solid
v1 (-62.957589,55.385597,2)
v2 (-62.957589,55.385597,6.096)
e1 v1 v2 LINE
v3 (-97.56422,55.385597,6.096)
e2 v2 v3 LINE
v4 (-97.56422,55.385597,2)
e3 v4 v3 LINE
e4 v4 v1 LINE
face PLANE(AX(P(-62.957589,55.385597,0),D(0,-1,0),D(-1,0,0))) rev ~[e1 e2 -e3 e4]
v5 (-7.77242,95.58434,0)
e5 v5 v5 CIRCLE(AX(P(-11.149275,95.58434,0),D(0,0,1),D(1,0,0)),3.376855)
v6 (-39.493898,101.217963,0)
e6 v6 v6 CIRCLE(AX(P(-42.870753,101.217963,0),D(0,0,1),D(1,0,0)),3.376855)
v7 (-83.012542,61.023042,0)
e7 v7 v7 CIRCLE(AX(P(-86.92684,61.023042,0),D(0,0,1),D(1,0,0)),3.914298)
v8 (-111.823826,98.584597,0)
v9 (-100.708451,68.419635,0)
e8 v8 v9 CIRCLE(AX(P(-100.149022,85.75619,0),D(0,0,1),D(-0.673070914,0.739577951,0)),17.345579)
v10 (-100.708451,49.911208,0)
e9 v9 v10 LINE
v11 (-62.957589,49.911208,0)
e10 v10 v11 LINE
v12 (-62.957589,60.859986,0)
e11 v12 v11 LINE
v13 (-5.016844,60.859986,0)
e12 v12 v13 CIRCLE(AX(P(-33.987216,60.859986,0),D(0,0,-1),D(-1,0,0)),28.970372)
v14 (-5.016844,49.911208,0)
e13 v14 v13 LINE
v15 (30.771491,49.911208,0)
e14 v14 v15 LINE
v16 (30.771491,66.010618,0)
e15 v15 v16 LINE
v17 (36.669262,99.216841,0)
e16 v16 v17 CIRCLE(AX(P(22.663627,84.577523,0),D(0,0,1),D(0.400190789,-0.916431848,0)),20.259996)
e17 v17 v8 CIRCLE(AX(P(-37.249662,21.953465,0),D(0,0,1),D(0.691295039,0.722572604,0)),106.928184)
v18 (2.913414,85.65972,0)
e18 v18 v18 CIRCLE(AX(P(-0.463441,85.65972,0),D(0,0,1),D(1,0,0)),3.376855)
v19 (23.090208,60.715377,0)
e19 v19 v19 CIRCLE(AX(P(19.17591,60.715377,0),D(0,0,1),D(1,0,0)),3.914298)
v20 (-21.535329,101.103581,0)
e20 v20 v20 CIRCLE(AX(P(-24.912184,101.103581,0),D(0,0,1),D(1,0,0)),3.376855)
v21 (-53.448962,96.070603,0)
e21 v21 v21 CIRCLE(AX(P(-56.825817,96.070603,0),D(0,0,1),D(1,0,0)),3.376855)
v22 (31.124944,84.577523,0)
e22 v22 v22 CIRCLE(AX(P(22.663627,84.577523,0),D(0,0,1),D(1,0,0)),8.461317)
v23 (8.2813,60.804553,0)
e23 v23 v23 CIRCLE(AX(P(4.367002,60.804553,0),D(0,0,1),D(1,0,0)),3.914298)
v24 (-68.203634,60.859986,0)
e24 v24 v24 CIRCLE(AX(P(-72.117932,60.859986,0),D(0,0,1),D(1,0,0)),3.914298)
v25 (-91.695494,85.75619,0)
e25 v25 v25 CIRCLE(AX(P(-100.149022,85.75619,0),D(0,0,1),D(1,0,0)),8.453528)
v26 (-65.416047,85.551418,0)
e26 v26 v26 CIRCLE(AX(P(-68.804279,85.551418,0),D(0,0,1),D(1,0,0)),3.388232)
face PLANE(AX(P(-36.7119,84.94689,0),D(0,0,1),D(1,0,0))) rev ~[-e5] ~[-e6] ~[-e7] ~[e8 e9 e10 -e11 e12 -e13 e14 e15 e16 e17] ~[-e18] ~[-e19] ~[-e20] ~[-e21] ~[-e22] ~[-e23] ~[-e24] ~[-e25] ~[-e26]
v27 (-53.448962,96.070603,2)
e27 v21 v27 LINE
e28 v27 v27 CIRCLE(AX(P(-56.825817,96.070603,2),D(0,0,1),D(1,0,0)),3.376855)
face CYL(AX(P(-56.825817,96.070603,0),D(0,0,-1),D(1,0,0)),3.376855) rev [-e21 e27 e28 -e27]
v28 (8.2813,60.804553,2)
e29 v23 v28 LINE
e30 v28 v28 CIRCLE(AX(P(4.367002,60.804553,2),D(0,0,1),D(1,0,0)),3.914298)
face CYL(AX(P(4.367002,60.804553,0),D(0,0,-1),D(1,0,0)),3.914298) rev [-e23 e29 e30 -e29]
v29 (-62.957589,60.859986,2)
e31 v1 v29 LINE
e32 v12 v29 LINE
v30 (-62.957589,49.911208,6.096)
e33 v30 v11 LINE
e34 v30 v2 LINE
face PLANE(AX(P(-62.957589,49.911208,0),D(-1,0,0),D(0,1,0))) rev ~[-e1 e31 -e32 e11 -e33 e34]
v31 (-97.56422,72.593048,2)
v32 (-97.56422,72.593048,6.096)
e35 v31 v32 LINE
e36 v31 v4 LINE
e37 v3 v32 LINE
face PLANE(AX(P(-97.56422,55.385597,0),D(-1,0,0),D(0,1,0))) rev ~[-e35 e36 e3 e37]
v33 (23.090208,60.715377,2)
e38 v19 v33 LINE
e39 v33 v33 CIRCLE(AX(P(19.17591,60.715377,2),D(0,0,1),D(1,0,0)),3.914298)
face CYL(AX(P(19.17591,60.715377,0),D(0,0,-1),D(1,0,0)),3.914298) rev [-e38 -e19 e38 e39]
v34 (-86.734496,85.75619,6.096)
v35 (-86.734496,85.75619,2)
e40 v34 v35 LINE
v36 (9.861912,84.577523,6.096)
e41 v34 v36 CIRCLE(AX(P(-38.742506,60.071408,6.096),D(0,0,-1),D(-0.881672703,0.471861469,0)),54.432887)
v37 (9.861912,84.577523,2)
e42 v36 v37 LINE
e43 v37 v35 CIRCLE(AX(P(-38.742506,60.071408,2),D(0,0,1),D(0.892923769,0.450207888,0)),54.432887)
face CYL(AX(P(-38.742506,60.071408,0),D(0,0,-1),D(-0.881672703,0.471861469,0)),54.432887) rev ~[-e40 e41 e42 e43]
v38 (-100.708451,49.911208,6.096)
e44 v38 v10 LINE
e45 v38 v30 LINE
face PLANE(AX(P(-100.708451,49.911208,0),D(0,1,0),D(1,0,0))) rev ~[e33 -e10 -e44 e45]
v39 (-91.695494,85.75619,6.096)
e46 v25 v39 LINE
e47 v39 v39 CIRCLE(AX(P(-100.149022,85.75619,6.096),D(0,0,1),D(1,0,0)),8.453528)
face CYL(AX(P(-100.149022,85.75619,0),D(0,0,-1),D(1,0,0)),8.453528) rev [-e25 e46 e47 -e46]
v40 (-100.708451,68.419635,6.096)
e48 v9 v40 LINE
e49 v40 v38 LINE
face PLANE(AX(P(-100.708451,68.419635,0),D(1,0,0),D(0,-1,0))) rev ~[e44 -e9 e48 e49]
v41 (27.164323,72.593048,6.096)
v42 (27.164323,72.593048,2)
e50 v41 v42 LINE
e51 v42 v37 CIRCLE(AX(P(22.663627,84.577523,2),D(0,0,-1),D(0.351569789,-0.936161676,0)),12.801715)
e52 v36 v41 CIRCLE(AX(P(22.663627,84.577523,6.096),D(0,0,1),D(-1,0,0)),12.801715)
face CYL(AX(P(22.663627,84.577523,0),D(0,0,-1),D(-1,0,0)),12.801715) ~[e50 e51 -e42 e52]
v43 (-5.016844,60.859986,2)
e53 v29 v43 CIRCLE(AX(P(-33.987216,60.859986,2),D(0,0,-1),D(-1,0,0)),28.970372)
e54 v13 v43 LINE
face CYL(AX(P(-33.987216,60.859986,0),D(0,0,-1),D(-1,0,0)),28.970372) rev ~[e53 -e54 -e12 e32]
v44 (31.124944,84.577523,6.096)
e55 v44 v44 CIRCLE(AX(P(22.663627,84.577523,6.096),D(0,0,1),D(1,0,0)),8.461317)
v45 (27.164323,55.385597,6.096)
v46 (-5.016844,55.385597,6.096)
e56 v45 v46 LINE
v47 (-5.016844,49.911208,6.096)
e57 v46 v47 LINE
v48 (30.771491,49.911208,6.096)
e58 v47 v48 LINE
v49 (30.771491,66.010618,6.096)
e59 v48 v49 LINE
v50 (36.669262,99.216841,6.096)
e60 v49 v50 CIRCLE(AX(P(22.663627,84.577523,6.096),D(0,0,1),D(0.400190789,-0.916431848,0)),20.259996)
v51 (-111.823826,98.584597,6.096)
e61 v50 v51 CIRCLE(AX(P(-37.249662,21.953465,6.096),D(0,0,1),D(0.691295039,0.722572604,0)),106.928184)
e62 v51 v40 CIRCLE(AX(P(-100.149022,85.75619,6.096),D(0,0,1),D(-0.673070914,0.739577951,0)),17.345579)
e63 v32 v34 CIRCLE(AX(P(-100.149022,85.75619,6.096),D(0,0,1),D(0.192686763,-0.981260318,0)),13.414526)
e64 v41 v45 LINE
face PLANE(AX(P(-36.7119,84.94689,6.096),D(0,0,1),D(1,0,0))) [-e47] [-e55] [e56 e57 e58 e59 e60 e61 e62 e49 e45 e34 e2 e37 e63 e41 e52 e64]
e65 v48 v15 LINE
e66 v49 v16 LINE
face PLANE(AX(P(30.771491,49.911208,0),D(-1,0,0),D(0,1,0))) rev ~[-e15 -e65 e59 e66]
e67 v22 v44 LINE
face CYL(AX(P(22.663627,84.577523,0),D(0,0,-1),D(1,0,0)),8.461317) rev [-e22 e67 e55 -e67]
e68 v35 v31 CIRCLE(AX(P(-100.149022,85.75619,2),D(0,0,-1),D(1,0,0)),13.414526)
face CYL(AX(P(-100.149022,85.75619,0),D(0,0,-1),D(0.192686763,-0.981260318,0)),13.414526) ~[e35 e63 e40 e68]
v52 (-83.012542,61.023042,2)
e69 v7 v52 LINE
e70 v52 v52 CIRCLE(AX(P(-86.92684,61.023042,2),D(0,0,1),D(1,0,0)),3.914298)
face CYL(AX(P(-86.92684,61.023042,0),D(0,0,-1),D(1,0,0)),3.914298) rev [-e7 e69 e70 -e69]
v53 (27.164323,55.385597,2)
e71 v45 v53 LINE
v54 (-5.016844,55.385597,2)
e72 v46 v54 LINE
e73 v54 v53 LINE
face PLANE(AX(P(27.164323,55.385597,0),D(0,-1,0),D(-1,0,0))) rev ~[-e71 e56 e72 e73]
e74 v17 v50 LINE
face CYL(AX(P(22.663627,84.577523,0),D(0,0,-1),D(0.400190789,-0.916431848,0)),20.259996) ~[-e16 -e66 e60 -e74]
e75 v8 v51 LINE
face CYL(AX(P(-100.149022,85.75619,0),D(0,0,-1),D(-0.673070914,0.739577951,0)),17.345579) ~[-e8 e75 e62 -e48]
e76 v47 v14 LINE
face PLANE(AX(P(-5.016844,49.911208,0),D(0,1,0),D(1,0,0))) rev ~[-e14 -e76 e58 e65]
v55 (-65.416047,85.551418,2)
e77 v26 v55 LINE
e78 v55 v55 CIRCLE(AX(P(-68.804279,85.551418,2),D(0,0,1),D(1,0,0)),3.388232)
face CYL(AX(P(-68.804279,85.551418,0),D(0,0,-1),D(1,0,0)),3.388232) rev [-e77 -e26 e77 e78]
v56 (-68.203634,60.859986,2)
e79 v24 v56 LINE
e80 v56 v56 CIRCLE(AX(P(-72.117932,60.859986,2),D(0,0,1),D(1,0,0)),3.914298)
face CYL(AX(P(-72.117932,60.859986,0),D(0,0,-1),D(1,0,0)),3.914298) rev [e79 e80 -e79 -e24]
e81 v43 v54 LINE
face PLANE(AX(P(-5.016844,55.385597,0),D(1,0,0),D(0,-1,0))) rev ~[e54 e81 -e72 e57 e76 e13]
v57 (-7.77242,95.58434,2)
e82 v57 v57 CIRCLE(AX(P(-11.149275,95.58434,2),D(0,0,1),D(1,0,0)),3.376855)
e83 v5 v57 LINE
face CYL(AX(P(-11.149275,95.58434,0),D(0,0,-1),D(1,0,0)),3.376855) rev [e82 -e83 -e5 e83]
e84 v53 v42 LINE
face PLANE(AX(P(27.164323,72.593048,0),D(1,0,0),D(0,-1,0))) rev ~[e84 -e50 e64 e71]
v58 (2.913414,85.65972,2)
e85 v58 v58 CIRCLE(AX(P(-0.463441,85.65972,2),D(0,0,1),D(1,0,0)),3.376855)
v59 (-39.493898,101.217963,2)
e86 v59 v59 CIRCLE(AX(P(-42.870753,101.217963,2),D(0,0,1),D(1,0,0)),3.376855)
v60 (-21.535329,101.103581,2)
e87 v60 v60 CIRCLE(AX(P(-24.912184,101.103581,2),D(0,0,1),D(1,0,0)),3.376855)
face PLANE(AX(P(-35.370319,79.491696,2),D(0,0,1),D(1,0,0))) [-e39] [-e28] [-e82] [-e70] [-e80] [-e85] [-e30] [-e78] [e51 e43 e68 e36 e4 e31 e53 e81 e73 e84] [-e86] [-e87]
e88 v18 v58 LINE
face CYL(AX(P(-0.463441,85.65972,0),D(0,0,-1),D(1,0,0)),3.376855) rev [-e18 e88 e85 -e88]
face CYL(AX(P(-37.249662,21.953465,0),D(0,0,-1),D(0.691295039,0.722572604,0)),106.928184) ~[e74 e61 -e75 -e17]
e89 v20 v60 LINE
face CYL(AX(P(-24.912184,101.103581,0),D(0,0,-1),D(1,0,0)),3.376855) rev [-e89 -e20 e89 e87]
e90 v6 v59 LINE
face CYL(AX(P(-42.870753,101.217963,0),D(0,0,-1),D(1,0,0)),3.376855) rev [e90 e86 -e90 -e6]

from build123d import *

# Parameters (mm, degrees)
F0_R     = 3.9142983579
F0_R_2   = 3.3882320549
F0_R_3   = 3.3768548991
F1_DEPTH = 2
F0_R_4   = 8.4535282778
F0_R_5   = 8.4613165319
F5_DEPTH = 6
F6_DEPTH = 6
F7_DEPTH = 6.096


# Not quite as in the source:
# - the program builds the solid bodies; features that only make, move or delete a surface that nothing else refers to are left out


with BuildPart() as f1:
    # F0 (on Top) → F1 (new body)
    with BuildSketch(Plane.XY):
        with BuildLine():
            Line((-5.016844254, 60.8599856496), (-5.016844254, 55.3855970502))
            Line((-5.016844254, 55.3855970502), (27.1643232554, 55.3855970502))
            Line((27.1643232554, 55.3855970502), (27.1643232554, 72.5930482149))
            ThreePointArc((27.1643232554, 72.5930482149), (15.3743446714, 74.0537278173), (9.8619121261, 84.5775231091))
            ThreePointArc((9.8619121261, 84.5775231091), (-38.0783668351, 114.5002429814), (-86.734496244, 85.7561899899))
            ThreePointArc((-86.734496244, 85.7561899899), (-89.789886214, 77.2334083533), (-97.5642204285, 72.5930482149))
            Line((-97.5642204285, 72.5930482149), (-97.5642204285, 55.3855970502))
            Line((-97.5642204285, 55.3855970502), (-82.5288370252, 55.3855970502))
            Line((-82.5288370252, 55.3855970502), (-62.9575885832, 55.3855970502))
            Line((-62.9575885832, 55.3855970502), (-62.9575885832, 60.8599856496))
            ThreePointArc((-62.9575885832, 60.8599856496), (-33.9872164186, 89.8303578142), (-5.016844254, 60.8599856496))
        make_face()
        with Locations((-86.9268402457, 61.0230416059)):
            Circle(F0_R, mode=Mode.SUBTRACT)
        with Locations((-72.1179321408, 60.8599856496)):
            Circle(F0_R, mode=Mode.SUBTRACT)
        with Locations((-68.8042789698, 85.551418364)):
            Circle(F0_R_2, mode=Mode.SUBTRACT)
        with Locations((4.3670018204, 60.8045533299)):
            Circle(F0_R, mode=Mode.SUBTRACT)
        with Locations((19.1759099253, 60.7153773308)):
            Circle(F0_R, mode=Mode.SUBTRACT)
        with Locations((-0.4634411598, 85.6597200036)):
            Circle(F0_R_3, mode=Mode.SUBTRACT)
        with Locations((-56.8258166313, 96.0706025362)):
            Circle(F0_R_3, mode=Mode.SUBTRACT)
        with Locations((-42.8707525134, 101.2179628015)):
            Circle(F0_R_3, mode=Mode.SUBTRACT)
        with Locations((-11.1492751166, 95.5843403935)):
            Circle(F0_R_3, mode=Mode.SUBTRACT)
        with Locations((-24.9121841043, 101.1035814881)):
            Circle(F0_R_3, mode=Mode.SUBTRACT)
    extrude(amount=F1_DEPTH)

    # F0 (on Top) → F5 (join)
    with BuildSketch(Plane.XY):
        with BuildLine():
            ThreePointArc((30.7714908133, 66.0106175583), (42.611434574, 81.0345848644), (36.6692617536, 99.2168411613))
            ThreePointArc((36.6692617536, 99.2168411613), (-37.7049289316, 128.8806796099), (-111.8238263521, 98.5845974088))
            ThreePointArc((-111.8238263521, 98.5845974088), (-116.4247817384, 79.7587957054), (-100.7084514224, 68.4196351703))
            Line((-100.7084514224, 68.4196351703), (-100.7084514224, 49.9112084508))
            Line((-100.7084514224, 49.9112084508), (-62.9575885832, 49.9112084508))
            Line((-62.9575885832, 49.9112084508), (-62.9575885832, 55.3855970502))
            Line((-62.9575885832, 55.3855970502), (-82.5288370252, 55.3855970502))
            Line((-82.5288370252, 55.3855970502), (-97.5642204285, 55.3855970502))
            Line((-97.5642204285, 55.3855970502), (-97.5642204285, 72.5930482149))
            ThreePointArc((-97.5642204285, 72.5930482149), (-89.789886214, 77.2334083533), (-86.734496244, 85.7561899899))
            ThreePointArc((-86.734496244, 85.7561899899), (-38.0783668351, 114.5002429814), (9.8619121261, 84.5775231091))
            ThreePointArc((9.8619121261, 84.5775231091), (15.3743446714, 74.0537278173), (27.1643232554, 72.5930482149))
            Line((27.1643232554, 72.5930482149), (27.1643232554, 55.3855970502))
            Line((27.1643232554, 55.3855970502), (-5.016844254, 55.3855970502))
            Line((-5.016844254, 55.3855970502), (-5.016844254, 49.9112084508))
            Line((-5.016844254, 49.9112084508), (30.7714908133, 49.9112084508))
            Line((30.7714908133, 49.9112084508), (30.7714908133, 66.0106175583))
        make_face()
        with Locations((-100.1490219674, 85.7561899899)):
            Circle(F0_R_4, mode=Mode.SUBTRACT)
        with Locations((22.6636270451, 84.5775231091)):
            Circle(F0_R_5, mode=Mode.SUBTRACT)
    extrude(amount=F5_DEPTH)

    # F0 (on Top) → F6 (join)
    with BuildSketch(Plane.XY):
        with BuildLine():
            ThreePointArc((30.7714908133, 66.0106175583), (42.611434574, 81.0345848644), (36.6692617536, 99.2168411613))
            ThreePointArc((36.6692617536, 99.2168411613), (-37.7049289316, 128.8806796099), (-111.8238263521, 98.5845974088))
            ThreePointArc((-111.8238263521, 98.5845974088), (-116.4247817384, 79.7587957054), (-100.7084514224, 68.4196351703))
            Line((-100.7084514224, 68.4196351703), (-100.7084514224, 49.9112084508))
            Line((-100.7084514224, 49.9112084508), (-62.9575885832, 49.9112084508))
            Line((-62.9575885832, 49.9112084508), (-62.9575885832, 55.3855970502))
            Line((-62.9575885832, 55.3855970502), (-82.5288370252, 55.3855970502))
            Line((-82.5288370252, 55.3855970502), (-97.5642204285, 55.3855970502))
            Line((-97.5642204285, 55.3855970502), (-97.5642204285, 72.5930482149))
            ThreePointArc((-97.5642204285, 72.5930482149), (-89.789886214, 77.2334083533), (-86.734496244, 85.7561899899))
            ThreePointArc((-86.734496244, 85.7561899899), (-38.0783668351, 114.5002429814), (9.8619121261, 84.5775231091))
            ThreePointArc((9.8619121261, 84.5775231091), (15.3743446714, 74.0537278173), (27.1643232554, 72.5930482149))
            Line((27.1643232554, 72.5930482149), (27.1643232554, 55.3855970502))
            Line((27.1643232554, 55.3855970502), (-5.016844254, 55.3855970502))
            Line((-5.016844254, 55.3855970502), (-5.016844254, 49.9112084508))
            Line((-5.016844254, 49.9112084508), (30.7714908133, 49.9112084508))
            Line((30.7714908133, 49.9112084508), (30.7714908133, 66.0106175583))
        make_face()
        with Locations((-100.1490219674, 85.7561899899)):
            Circle(F0_R_4, mode=Mode.SUBTRACT)
        with Locations((22.6636270451, 84.5775231091)):
            Circle(F0_R_5, mode=Mode.SUBTRACT)
    extrude(amount=F6_DEPTH)

    # F0 (on Top) → F7 (join)
    with BuildSketch(Plane.XY):
        with BuildLine():
            ThreePointArc((30.7714908133, 66.0106175583), (42.611434574, 81.0345848644), (36.6692617536, 99.2168411613))
            ThreePointArc((36.6692617536, 99.2168411613), (-37.7049289316, 128.8806796099), (-111.8238263521, 98.5845974088))
            ThreePointArc((-111.8238263521, 98.5845974088), (-116.4247817384, 79.7587957054), (-100.7084514224, 68.4196351703))
            Line((-100.7084514224, 68.4196351703), (-100.7084514224, 49.9112084508))
            Line((-100.7084514224, 49.9112084508), (-62.9575885832, 49.9112084508))
            Line((-62.9575885832, 49.9112084508), (-62.9575885832, 55.3855970502))
            Line((-62.9575885832, 55.3855970502), (-82.5288370252, 55.3855970502))
            Line((-82.5288370252, 55.3855970502), (-97.5642204285, 55.3855970502))
            Line((-97.5642204285, 55.3855970502), (-97.5642204285, 72.5930482149))
            ThreePointArc((-97.5642204285, 72.5930482149), (-89.789886214, 77.2334083533), (-86.734496244, 85.7561899899))
            ThreePointArc((-86.734496244, 85.7561899899), (-38.0783668351, 114.5002429814), (9.8619121261, 84.5775231091))
            ThreePointArc((9.8619121261, 84.5775231091), (15.3743446714, 74.0537278173), (27.1643232554, 72.5930482149))
            Line((27.1643232554, 72.5930482149), (27.1643232554, 55.3855970502))
            Line((27.1643232554, 55.3855970502), (-5.016844254, 55.3855970502))
            Line((-5.016844254, 55.3855970502), (-5.016844254, 49.9112084508))
            Line((-5.016844254, 49.9112084508), (30.7714908133, 49.9112084508))
            Line((30.7714908133, 49.9112084508), (30.7714908133, 66.0106175583))
        make_face()
        with Locations((-100.1490219674, 85.7561899899)):
            Circle(F0_R_4, mode=Mode.SUBTRACT)
        with Locations((22.6636270451, 84.5775231091)):
            Circle(F0_R_5, mode=Mode.SUBTRACT)
    extrude(amount=F7_DEPTH)


solid = f1.part
